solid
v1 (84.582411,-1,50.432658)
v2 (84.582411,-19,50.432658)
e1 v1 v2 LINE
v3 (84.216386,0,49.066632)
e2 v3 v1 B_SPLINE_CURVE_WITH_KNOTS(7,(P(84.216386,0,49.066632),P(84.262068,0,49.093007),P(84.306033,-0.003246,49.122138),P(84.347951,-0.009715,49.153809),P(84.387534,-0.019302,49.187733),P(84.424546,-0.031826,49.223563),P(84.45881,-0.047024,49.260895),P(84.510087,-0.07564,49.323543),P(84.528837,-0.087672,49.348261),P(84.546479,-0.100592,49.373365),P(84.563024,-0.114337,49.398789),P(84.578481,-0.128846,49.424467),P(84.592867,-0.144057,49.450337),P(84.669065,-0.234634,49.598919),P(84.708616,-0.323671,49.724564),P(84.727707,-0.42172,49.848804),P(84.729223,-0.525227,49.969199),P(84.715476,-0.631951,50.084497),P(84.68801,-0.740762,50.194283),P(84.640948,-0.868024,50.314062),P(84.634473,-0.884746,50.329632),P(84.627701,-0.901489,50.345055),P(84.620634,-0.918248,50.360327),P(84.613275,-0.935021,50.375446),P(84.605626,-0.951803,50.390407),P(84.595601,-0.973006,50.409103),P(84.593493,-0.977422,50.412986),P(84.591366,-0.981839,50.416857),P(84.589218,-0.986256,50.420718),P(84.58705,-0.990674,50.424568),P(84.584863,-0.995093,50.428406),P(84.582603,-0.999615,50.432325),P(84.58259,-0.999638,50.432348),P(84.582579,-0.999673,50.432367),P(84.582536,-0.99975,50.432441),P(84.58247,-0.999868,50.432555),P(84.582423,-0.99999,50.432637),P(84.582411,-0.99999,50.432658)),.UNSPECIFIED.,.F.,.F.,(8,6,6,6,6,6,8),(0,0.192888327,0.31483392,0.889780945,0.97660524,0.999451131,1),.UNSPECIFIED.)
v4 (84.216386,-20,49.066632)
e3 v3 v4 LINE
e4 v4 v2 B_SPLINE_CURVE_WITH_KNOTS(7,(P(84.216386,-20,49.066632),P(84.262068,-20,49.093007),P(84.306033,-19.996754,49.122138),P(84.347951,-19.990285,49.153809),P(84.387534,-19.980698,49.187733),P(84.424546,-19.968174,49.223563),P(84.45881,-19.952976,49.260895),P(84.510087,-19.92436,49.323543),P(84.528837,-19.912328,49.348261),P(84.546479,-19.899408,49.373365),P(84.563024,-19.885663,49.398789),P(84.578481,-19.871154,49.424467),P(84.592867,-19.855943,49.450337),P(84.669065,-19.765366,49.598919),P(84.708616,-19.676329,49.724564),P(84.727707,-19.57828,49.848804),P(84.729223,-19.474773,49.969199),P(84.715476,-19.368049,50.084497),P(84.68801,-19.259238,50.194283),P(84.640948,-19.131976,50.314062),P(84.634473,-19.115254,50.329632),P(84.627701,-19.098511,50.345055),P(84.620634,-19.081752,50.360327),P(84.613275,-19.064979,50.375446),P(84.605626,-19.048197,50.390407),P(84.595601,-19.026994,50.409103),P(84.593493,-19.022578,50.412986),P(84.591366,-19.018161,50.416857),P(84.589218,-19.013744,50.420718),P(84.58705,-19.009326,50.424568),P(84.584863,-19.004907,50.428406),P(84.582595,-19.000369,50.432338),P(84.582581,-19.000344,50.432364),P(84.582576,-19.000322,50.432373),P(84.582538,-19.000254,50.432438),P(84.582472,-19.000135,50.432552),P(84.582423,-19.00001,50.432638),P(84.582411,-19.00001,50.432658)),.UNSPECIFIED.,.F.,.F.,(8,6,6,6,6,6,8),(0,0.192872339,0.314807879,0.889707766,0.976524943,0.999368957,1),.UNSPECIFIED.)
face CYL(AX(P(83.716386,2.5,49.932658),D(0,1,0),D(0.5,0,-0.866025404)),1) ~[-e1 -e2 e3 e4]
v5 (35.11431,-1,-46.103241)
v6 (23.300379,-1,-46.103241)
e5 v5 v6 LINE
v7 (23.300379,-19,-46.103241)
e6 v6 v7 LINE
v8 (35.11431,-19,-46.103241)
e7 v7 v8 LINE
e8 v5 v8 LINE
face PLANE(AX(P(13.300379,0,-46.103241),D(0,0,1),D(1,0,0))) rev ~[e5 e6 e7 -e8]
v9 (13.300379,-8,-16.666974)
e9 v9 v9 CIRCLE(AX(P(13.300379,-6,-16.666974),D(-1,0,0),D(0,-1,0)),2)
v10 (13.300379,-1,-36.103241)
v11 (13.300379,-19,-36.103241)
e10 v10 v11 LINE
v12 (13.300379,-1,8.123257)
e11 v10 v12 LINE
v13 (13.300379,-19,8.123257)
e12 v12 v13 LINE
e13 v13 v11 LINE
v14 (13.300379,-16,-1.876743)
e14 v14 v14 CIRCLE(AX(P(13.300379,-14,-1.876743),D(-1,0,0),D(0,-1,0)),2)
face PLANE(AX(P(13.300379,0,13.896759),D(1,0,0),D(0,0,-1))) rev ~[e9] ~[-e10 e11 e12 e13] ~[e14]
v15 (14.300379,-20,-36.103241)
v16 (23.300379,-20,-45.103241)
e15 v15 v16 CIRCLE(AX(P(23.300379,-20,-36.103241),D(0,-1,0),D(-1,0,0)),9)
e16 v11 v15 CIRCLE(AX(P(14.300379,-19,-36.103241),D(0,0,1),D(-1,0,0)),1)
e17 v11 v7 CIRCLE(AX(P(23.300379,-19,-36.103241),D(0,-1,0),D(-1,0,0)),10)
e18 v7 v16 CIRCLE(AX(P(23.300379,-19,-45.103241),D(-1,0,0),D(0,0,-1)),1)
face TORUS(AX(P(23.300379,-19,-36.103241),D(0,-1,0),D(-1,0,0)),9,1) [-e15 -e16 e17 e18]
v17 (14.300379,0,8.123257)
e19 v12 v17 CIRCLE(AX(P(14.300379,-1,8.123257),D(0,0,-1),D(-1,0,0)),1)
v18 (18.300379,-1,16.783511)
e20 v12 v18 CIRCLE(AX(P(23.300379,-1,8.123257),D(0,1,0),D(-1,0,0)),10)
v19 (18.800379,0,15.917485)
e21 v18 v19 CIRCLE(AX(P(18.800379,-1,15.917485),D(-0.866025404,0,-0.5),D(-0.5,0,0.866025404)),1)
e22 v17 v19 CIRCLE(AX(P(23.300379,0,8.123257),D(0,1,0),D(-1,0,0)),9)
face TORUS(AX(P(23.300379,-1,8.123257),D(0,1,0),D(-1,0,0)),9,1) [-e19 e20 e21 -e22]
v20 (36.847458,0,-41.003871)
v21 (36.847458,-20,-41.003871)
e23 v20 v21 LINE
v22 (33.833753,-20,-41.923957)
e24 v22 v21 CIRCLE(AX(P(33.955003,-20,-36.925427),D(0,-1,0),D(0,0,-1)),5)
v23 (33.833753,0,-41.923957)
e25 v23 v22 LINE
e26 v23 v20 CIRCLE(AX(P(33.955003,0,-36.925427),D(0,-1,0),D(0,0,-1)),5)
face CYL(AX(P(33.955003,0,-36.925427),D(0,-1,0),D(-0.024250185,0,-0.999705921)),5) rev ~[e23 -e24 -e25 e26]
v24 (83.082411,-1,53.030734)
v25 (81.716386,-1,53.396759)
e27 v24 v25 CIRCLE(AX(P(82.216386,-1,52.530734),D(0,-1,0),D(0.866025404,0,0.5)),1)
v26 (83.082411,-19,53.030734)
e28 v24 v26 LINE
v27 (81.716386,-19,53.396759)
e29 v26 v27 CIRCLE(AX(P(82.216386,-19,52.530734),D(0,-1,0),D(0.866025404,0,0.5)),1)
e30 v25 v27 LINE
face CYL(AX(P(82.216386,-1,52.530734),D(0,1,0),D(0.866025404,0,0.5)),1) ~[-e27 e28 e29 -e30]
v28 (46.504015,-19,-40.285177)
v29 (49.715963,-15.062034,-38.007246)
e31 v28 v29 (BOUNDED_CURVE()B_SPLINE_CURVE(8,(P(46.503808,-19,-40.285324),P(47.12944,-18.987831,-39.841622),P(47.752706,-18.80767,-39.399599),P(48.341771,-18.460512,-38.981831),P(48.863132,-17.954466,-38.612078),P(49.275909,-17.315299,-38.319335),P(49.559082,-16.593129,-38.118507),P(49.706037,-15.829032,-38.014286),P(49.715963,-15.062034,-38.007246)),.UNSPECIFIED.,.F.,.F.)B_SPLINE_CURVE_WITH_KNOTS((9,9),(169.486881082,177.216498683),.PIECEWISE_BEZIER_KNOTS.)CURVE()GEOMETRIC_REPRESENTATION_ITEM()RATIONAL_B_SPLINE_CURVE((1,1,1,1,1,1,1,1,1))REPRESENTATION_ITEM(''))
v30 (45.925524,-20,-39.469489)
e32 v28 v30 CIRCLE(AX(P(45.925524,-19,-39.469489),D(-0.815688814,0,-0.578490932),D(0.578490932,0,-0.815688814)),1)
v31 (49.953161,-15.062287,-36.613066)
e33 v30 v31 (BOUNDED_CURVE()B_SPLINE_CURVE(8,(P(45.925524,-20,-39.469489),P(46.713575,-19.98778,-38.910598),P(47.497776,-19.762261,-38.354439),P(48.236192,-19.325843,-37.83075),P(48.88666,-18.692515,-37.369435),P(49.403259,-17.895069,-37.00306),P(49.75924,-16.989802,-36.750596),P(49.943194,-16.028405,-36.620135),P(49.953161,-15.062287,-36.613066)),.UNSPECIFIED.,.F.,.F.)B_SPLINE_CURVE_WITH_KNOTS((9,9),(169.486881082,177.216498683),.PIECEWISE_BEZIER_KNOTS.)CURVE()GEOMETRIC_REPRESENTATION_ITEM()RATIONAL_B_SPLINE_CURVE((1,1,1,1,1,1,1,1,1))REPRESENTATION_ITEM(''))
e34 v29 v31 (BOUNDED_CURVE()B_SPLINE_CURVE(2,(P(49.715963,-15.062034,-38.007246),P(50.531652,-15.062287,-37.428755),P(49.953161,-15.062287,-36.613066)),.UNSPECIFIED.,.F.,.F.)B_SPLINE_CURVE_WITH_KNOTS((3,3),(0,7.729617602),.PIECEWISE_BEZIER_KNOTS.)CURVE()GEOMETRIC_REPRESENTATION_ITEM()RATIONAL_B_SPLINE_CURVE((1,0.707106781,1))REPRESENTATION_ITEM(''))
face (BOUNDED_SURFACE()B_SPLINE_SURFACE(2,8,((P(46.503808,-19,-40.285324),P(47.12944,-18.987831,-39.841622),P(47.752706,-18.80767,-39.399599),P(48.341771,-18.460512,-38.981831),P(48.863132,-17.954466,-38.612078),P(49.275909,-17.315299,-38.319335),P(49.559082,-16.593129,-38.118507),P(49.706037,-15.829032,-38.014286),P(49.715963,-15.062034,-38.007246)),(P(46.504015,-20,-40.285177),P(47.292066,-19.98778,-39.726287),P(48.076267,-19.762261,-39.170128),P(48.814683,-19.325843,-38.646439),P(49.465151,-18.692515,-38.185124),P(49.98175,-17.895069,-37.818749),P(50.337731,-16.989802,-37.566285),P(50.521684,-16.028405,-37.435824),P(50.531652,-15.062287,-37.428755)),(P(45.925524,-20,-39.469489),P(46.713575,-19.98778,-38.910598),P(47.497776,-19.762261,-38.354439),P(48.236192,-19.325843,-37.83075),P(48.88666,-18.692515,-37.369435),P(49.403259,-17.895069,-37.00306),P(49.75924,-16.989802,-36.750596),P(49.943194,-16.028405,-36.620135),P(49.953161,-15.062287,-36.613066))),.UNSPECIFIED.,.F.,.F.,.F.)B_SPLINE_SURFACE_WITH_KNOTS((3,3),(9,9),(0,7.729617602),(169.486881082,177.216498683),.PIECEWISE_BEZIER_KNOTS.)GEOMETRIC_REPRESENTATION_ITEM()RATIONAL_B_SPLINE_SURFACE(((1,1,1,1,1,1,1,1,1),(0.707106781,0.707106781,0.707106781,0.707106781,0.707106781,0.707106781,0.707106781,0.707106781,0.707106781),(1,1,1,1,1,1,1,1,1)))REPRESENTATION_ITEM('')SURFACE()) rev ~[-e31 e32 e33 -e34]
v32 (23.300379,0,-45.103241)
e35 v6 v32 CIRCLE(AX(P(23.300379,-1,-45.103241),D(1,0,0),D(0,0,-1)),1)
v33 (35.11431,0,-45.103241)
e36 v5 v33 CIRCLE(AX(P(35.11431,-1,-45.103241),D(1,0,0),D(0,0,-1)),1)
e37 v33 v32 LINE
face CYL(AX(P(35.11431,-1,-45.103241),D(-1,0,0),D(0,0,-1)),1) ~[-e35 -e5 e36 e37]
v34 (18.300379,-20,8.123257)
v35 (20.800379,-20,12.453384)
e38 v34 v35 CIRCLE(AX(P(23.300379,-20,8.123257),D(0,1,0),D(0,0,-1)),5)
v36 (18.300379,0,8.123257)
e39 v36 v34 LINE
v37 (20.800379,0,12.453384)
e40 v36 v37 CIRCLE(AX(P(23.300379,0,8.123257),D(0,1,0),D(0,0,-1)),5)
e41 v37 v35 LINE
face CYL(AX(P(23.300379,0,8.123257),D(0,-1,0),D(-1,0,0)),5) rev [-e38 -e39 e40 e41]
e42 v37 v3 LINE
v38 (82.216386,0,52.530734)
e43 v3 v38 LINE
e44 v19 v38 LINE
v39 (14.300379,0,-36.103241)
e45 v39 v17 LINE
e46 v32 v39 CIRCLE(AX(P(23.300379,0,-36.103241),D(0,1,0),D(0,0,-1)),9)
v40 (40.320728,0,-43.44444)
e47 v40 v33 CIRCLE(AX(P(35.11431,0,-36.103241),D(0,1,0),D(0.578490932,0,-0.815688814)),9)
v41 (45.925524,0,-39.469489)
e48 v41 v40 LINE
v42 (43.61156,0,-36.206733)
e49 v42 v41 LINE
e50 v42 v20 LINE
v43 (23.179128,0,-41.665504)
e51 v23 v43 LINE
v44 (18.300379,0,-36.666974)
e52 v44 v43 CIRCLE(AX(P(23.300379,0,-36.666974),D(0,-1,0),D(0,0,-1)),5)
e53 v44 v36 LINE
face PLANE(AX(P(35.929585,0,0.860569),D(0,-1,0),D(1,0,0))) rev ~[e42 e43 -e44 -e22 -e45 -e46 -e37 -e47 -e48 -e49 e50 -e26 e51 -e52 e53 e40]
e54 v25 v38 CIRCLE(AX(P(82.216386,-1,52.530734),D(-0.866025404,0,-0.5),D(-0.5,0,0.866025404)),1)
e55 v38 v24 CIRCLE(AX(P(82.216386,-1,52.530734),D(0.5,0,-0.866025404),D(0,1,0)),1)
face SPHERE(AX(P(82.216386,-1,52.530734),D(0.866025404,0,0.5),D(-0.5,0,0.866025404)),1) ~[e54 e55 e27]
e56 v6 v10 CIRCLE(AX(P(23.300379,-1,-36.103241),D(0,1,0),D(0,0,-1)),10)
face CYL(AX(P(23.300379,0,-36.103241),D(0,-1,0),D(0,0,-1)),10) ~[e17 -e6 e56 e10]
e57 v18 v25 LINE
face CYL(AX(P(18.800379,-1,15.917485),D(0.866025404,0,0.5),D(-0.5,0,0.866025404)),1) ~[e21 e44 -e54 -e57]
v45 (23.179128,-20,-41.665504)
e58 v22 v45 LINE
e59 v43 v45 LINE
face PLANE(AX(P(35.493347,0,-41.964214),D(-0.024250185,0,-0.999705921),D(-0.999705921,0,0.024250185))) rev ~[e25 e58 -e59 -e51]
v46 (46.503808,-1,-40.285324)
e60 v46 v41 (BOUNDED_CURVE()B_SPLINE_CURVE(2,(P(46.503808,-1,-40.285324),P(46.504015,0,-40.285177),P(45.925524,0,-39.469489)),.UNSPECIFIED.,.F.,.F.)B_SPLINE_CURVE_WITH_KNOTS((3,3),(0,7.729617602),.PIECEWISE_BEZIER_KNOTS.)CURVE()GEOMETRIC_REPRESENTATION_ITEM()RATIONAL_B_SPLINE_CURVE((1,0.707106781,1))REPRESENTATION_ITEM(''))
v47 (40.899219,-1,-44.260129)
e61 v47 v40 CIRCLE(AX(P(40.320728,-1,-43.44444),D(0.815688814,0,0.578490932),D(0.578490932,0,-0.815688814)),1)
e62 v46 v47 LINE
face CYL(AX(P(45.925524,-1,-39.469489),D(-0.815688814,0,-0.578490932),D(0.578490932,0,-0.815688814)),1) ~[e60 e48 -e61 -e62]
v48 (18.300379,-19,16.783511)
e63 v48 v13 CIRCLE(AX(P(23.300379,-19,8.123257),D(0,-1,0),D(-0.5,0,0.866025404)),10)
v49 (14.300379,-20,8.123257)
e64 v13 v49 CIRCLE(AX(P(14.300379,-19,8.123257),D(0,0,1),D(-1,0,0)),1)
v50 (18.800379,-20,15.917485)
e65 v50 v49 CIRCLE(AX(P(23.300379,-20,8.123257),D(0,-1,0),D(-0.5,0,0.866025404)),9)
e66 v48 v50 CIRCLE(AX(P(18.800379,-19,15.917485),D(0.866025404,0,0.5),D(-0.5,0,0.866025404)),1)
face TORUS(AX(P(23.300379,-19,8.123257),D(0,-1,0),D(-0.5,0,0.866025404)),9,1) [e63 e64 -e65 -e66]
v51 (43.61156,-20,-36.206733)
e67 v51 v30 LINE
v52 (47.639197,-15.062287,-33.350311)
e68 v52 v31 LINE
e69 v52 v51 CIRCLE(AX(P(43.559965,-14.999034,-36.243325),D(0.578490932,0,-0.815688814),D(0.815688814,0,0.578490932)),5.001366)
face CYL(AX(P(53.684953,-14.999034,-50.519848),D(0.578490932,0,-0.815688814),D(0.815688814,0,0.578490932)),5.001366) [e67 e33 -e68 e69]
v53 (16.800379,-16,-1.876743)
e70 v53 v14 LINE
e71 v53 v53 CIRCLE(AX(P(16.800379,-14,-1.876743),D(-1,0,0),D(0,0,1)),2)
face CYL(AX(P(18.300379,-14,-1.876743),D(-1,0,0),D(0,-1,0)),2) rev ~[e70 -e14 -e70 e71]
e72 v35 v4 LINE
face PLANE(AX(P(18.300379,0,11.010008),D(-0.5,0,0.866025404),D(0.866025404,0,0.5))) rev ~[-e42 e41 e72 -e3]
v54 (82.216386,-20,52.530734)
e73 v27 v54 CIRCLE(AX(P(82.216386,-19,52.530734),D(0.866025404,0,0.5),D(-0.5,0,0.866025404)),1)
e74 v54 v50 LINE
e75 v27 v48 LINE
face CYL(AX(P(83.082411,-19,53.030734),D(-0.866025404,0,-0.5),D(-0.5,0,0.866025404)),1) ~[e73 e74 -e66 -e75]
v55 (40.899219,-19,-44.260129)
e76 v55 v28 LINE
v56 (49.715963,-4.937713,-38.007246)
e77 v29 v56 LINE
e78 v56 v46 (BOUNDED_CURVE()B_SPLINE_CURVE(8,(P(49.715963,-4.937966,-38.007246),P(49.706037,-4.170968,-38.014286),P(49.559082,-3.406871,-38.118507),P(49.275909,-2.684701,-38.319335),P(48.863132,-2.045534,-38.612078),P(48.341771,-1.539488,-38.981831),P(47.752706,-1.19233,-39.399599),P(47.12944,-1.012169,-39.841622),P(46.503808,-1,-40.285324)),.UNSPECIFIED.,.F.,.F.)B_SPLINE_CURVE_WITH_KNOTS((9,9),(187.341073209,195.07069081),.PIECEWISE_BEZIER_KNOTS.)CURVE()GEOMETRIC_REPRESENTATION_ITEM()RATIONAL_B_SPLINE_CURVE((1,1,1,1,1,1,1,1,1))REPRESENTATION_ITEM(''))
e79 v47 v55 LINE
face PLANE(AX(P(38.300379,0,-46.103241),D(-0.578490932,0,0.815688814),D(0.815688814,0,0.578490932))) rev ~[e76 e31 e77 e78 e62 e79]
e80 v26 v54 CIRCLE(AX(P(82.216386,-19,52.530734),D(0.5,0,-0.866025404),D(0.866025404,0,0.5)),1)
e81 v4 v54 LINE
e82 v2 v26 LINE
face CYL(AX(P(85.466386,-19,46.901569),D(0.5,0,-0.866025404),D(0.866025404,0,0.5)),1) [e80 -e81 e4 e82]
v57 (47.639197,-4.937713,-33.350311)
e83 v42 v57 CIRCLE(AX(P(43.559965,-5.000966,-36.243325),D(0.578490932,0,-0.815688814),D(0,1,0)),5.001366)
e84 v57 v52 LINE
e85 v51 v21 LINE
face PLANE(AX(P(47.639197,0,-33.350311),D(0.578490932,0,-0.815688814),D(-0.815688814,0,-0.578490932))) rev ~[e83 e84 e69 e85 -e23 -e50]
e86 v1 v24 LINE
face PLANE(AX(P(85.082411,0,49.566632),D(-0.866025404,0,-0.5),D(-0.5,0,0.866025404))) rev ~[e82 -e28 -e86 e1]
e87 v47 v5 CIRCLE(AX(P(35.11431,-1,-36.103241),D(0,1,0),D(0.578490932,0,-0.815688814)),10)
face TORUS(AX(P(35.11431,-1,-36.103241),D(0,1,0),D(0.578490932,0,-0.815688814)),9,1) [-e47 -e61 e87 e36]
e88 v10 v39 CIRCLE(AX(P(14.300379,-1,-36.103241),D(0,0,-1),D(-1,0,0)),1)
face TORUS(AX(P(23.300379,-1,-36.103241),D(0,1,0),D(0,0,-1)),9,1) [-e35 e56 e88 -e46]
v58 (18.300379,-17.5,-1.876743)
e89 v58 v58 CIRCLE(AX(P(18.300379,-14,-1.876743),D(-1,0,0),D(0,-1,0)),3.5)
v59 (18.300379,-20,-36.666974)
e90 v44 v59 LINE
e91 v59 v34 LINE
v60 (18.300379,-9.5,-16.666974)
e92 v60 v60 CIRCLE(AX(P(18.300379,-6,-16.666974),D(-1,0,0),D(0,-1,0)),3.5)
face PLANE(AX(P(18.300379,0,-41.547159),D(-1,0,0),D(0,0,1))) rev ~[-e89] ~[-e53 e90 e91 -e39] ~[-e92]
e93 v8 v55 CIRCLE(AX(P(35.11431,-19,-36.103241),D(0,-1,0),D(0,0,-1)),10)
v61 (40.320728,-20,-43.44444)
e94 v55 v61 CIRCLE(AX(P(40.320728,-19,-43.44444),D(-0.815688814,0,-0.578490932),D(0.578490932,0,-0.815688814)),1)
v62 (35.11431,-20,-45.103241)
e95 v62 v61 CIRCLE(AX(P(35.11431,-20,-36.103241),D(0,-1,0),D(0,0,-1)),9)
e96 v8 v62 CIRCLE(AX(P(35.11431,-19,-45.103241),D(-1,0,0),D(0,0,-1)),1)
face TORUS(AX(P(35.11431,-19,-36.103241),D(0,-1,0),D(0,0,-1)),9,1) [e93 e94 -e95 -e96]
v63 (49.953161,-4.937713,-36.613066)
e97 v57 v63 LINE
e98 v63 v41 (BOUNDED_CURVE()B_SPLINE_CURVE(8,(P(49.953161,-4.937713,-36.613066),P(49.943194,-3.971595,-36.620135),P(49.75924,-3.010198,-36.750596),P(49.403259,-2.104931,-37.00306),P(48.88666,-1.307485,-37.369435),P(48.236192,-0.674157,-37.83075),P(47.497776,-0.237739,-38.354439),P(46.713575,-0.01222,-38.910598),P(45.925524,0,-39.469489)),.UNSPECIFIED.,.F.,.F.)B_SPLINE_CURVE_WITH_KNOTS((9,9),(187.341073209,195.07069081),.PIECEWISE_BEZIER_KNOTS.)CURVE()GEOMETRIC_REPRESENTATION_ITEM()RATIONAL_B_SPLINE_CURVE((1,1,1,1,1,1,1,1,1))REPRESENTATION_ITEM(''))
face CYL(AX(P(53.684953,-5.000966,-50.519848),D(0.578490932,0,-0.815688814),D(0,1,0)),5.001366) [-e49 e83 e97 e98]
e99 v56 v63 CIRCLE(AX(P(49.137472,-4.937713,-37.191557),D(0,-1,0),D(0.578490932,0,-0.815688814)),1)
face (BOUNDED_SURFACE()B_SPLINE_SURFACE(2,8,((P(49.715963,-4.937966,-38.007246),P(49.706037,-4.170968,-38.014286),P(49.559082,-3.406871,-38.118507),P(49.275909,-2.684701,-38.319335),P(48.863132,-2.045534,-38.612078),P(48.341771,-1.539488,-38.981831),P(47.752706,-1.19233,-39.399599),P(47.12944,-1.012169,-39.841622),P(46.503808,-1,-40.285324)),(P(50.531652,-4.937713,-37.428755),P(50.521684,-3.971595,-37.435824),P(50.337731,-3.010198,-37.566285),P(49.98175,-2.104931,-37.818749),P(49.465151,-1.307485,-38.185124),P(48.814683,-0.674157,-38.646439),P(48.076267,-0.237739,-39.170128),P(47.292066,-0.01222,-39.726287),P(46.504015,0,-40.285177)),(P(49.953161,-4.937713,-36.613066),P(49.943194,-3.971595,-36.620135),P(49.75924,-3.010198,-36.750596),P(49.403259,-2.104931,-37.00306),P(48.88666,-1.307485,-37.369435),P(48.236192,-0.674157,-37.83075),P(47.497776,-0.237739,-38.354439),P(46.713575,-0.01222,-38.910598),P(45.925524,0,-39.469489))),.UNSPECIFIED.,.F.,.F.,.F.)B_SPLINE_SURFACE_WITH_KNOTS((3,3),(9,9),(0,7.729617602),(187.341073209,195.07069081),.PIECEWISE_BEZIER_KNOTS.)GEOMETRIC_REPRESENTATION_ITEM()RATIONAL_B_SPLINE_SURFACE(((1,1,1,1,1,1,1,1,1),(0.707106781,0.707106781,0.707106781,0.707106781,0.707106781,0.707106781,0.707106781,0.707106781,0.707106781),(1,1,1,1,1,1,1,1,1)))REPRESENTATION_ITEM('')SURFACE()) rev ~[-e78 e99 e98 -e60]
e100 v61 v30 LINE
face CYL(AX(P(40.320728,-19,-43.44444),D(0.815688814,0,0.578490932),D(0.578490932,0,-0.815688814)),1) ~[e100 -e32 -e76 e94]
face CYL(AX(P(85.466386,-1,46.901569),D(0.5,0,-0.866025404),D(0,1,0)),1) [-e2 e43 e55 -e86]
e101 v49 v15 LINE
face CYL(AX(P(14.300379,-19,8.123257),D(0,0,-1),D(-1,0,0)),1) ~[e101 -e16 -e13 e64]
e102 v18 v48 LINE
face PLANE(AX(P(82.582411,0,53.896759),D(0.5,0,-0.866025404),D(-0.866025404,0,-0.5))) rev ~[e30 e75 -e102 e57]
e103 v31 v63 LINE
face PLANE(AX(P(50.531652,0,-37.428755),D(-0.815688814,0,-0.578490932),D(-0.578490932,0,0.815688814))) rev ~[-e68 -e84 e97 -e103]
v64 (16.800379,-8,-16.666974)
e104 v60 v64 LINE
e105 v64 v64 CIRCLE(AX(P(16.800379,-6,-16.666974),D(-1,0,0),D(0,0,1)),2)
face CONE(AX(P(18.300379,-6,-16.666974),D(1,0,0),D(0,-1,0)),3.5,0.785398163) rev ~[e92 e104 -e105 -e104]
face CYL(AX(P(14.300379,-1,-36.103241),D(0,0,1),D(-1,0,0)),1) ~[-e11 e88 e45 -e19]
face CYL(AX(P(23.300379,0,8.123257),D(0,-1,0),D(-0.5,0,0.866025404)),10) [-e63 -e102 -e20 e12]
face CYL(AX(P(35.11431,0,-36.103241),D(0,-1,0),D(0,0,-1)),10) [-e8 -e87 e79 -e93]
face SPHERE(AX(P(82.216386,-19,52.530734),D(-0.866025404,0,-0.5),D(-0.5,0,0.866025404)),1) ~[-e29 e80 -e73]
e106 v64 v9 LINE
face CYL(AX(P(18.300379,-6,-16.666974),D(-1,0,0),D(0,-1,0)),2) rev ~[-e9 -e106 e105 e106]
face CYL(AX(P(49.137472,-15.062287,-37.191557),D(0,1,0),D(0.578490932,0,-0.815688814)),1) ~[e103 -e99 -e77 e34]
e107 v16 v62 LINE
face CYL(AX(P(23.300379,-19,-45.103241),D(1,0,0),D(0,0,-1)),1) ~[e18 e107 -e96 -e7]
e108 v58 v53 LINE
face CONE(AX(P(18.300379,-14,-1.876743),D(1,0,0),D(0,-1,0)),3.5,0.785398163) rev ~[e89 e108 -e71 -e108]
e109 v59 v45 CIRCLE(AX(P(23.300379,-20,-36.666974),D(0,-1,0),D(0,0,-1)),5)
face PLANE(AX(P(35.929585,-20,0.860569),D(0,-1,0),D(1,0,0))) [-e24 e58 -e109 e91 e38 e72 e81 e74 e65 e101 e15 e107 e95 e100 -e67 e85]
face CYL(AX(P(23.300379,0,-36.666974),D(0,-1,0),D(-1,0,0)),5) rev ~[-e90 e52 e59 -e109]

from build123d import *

# Parameters (mm, degrees)
F1_DEPTH       = 20
F2_R           = 10
F3_R           = 10
F4_R           = 5
F5_R           = 5
F6_R           = 5
F8_D           = 4
F8_DEPTH       = 12
F8_CSINK_D     = 7
F8_CSINK_ANGLE = 90
F8_TIP         = 1.2017212381
F9_T1_DEPTH    = 30.0048285071
F10_R          = 1
F11_T1_DEPTH   = 25
F11_T3_DEPTH   = 18
F11_T5_DEPTH   = 6.5
F11_T8_ANGLE   = 90
F11_T10_ANGLE  = 90


# Not quite as in the source:
# - a fillet or chamfer that OpenCascade refuses, or shapes differently, is made with other operations: its cross-section is extruded or revolved along the edge and cut away or added


with BuildPart() as f1:
    # F0 (on Front) → F1 (new body)
    with BuildSketch(Plane.XZ):
        Polygon((13.3003787555, -46.1032405242), (38.3003787555, -46.1032405242), (50.5316518247, -37.4287553132), (47.6391971652, -33.3503112419), (35.4933471628, -41.9642139506), (18.3003787555, -41.5471586402), (18.3003787555, 11.0100081298), (85.0824110582, 49.5666324568), (82.5824110582, 53.8967594758), (13.3003787555, 13.8967594758), align=None)
    extrude(amount=F1_DEPTH)

    # F2
    f2_edges = [f1.edges().sort_by_distance(p)[0] for p in [
        (13.300379, -10, 13.896759),
        (13.300379, -10, -46.103241),
    ]]
    fillet(f2_edges, radius=F2_R)

    # F3
    f3_edges = [f1.edges().sort_by_distance(p)[0] for p in [
        (38.300379, -10, -46.103241),
    ]]
    fillet(f3_edges, radius=F3_R)

    # F4
    f4_edges = [f1.edges().sort_by_distance(p)[0] for p in [
        (18.300379, -10, 11.010008),
    ]]
    fillet(f4_edges, radius=F4_R)

    # F5
    f5_edges = [f1.edges().sort_by_distance(p)[0] for p in [
        (18.300379, -10, -41.547159),
    ]]
    fillet(f5_edges, radius=F5_R)

    # F6
    f6_edges = [f1.edges().sort_by_distance(p)[0] for p in [
        (35.493347, -10, -41.964214),
    ]]
    fillet(f6_edges, radius=F6_R)

    # F8
    with Locations(Plane.YZ.offset(18.3003787555)):
        with Locations((-6, -16.6669744052), (-14, -1.8767432161)):
            CounterSinkHole(F8_D / 2, F8_CSINK_D / 2, depth=F8_DEPTH, counter_sink_angle=F8_CSINK_ANGLE)
            with Locations((0, 0, -(F8_DEPTH + F8_TIP / 2))):  # 118° drill point
                Cone(0, F8_D / 2, F8_TIP, mode=Mode.SUBTRACT)

    # F9: fillet of radius 5 on 2 edges, made by hand

    # F9_s2 → F9_t1 (cut)
    with BuildSketch(Plane(origin=(41.804493112, 0, -58.9455349028), x_dir=(0, 1, 0), z_dir=(-0.5784909319, 0, 0.8156888143))):
        with BuildLine():
            ThreePointArc((0.0004, -14.5649419331), (-1.4644660941, -18.1014415245), (-5.0009656854, -19.5663076185))
            Line((-5.0009656854, -19.5663076185), (-5.0009656854, -20.0664441871))
            ThreePointArc((-5.0009656854, -20.0664441871), (-2.5004828427, -20.0660441871), (0, -20.0660441871))
            Line((0, -20.0660441871), (0.5001365685, -19.5659076185))
            ThreePointArc((0.5001365685, -19.5659076185), (0.5001365685, -17.0654247758), (0.5005365685, -14.5649419331))
            Line((0.5005365685, -14.5649419331), (0.0004, -14.5649419331))
        make_face()
        with BuildLine():
            ThreePointArc((-14.9990343146, -19.5663076185), (-18.5355339059, -18.1014415245), (-20.0004, -14.5649419331))
            Line((-20.0004, -14.5649419331), (-20.5005365685, -14.5649419331))
            ThreePointArc((-20.5005365685, -14.5649419331), (-20.5001365685, -17.0654247758), (-20.5001365685, -19.5659076185))
            Line((-20.5001365685, -19.5659076185), (-20, -20.0660441871))
            ThreePointArc((-20, -20.0660441871), (-17.4995171573, -20.0660441871), (-14.9990343146, -20.0664441871))
            Line((-14.9990343146, -20.0664441871), (-14.9990343146, -19.5663076185))
        make_face()
    extrude(amount=F9_T1_DEPTH, mode=Mode.SUBTRACT)

    # F10
    f10_edges = [f1.edges().sort_by_distance(p)[0] for p in [
        (50.441395, -20, 35.340135),
        (14.640125, -20, 13.123257),
        (13.300379, -20, -13.989992),
        (16.229311, -20, -43.174308),
        (29.207344, -20, -46.103241),
        (38.150024, -20, -45.631327),
        (43.701617, -20, -42.272653),
    ]]
    fillet(f10_edges, radius=F10_R)

    # F11: fillet of radius 1 on 6 edges, made by hand

    # F11_s2 → F11_t1 (cut)
    with BuildSketch(Plane.XZ.offset(-2.5)):
        with BuildLine():
            ThreePointArc((84.2163856545, 49.0666324568), (84.6823114807, 49.6738388155), (84.5824110582, 50.4326578606))
            Line((84.5824110582, 50.4326578606), (85.0824110582, 49.5666324568))
            Line((85.0824110582, 49.5666324568), (84.2163856545, 49.0666324568))
        make_face()
    extrude(amount=F11_T1_DEPTH, mode=Mode.SUBTRACT)

    # F11_s4 → F11_t3 (cut)
    with BuildSketch(Plane.XZ.offset(1)):
        with BuildLine():
            ThreePointArc((83.0824110582, 53.030734072), (82.4752046996, 53.4966598983), (81.7163856545, 53.3967594758))
            Line((81.7163856545, 53.3967594758), (82.5824110582, 53.8967594758))
            Line((82.5824110582, 53.8967594758), (83.0824110582, 53.030734072))
        make_face()
    extrude(amount=F11_T3_DEPTH, mode=Mode.SUBTRACT)

    # F11_s6 → F11_t5 (cut)
    with BuildSketch(Plane(origin=(1.0576213207, 0, -1.8318538627), x_dir=(0, 1, 0), z_dir=(-0.5, 0, 0.8660254038))):
        with BuildLine():
            ThreePointArc((0, -97.4668456201), (-0.2928932188, -98.1739524013), (-1, -98.4668456201))
            Line((-1, -98.4668456201), (0, -98.4668456201))
            Line((0, -98.4668456201), (0, -97.4668456201))
        make_face()
        with BuildLine():
            ThreePointArc((-19, -98.4668456201), (-19.7071067812, -98.1739524013), (-20, -97.4668456201))
            Line((-20, -97.4668456201), (-20, -98.4668456201))
            Line((-20, -98.4668456201), (-19, -98.4668456201))
        make_face()
    extrude(amount=F11_T5_DEPTH, mode=Mode.SUBTRACT)

    # F11_s7 → F11_t8 (revolve, cut)
    with BuildSketch(Plane.XZ.offset(1)):
        with BuildLine():
            ThreePointArc((81.7163856545, 53.3967594758), (82.4752046996, 53.4966598983), (83.0824110582, 53.030734072))
            Line((83.0824110582, 53.030734072), (82.5824110582, 53.8967594758))
            Line((82.5824110582, 53.8967594758), (81.7163856545, 53.3967594758))
        make_face()
    revolve(axis=Axis((83.0824110582, -1, 53.030734072), (-0.8660254038, 0, -0.5)), revolution_arc=F11_T8_ANGLE, mode=Mode.SUBTRACT)

    # F11_s9 → F11_t10 (revolve, cut)
    with BuildSketch(Plane.XZ.offset(19)):
        with BuildLine():
            ThreePointArc((83.0824110582, 53.030734072), (82.4752046996, 53.4966598983), (81.7163856545, 53.3967594758))
            Line((81.7163856545, 53.3967594758), (82.5824110582, 53.8967594758))
            Line((82.5824110582, 53.8967594758), (83.0824110582, 53.030734072))
        make_face()
    revolve(axis=Axis((83.0824110582, -19, 53.030734072), (0.8660254038, 0, 0.5)), revolution_arc=F11_T10_ANGLE, mode=Mode.SUBTRACT)


solid = f1.part
